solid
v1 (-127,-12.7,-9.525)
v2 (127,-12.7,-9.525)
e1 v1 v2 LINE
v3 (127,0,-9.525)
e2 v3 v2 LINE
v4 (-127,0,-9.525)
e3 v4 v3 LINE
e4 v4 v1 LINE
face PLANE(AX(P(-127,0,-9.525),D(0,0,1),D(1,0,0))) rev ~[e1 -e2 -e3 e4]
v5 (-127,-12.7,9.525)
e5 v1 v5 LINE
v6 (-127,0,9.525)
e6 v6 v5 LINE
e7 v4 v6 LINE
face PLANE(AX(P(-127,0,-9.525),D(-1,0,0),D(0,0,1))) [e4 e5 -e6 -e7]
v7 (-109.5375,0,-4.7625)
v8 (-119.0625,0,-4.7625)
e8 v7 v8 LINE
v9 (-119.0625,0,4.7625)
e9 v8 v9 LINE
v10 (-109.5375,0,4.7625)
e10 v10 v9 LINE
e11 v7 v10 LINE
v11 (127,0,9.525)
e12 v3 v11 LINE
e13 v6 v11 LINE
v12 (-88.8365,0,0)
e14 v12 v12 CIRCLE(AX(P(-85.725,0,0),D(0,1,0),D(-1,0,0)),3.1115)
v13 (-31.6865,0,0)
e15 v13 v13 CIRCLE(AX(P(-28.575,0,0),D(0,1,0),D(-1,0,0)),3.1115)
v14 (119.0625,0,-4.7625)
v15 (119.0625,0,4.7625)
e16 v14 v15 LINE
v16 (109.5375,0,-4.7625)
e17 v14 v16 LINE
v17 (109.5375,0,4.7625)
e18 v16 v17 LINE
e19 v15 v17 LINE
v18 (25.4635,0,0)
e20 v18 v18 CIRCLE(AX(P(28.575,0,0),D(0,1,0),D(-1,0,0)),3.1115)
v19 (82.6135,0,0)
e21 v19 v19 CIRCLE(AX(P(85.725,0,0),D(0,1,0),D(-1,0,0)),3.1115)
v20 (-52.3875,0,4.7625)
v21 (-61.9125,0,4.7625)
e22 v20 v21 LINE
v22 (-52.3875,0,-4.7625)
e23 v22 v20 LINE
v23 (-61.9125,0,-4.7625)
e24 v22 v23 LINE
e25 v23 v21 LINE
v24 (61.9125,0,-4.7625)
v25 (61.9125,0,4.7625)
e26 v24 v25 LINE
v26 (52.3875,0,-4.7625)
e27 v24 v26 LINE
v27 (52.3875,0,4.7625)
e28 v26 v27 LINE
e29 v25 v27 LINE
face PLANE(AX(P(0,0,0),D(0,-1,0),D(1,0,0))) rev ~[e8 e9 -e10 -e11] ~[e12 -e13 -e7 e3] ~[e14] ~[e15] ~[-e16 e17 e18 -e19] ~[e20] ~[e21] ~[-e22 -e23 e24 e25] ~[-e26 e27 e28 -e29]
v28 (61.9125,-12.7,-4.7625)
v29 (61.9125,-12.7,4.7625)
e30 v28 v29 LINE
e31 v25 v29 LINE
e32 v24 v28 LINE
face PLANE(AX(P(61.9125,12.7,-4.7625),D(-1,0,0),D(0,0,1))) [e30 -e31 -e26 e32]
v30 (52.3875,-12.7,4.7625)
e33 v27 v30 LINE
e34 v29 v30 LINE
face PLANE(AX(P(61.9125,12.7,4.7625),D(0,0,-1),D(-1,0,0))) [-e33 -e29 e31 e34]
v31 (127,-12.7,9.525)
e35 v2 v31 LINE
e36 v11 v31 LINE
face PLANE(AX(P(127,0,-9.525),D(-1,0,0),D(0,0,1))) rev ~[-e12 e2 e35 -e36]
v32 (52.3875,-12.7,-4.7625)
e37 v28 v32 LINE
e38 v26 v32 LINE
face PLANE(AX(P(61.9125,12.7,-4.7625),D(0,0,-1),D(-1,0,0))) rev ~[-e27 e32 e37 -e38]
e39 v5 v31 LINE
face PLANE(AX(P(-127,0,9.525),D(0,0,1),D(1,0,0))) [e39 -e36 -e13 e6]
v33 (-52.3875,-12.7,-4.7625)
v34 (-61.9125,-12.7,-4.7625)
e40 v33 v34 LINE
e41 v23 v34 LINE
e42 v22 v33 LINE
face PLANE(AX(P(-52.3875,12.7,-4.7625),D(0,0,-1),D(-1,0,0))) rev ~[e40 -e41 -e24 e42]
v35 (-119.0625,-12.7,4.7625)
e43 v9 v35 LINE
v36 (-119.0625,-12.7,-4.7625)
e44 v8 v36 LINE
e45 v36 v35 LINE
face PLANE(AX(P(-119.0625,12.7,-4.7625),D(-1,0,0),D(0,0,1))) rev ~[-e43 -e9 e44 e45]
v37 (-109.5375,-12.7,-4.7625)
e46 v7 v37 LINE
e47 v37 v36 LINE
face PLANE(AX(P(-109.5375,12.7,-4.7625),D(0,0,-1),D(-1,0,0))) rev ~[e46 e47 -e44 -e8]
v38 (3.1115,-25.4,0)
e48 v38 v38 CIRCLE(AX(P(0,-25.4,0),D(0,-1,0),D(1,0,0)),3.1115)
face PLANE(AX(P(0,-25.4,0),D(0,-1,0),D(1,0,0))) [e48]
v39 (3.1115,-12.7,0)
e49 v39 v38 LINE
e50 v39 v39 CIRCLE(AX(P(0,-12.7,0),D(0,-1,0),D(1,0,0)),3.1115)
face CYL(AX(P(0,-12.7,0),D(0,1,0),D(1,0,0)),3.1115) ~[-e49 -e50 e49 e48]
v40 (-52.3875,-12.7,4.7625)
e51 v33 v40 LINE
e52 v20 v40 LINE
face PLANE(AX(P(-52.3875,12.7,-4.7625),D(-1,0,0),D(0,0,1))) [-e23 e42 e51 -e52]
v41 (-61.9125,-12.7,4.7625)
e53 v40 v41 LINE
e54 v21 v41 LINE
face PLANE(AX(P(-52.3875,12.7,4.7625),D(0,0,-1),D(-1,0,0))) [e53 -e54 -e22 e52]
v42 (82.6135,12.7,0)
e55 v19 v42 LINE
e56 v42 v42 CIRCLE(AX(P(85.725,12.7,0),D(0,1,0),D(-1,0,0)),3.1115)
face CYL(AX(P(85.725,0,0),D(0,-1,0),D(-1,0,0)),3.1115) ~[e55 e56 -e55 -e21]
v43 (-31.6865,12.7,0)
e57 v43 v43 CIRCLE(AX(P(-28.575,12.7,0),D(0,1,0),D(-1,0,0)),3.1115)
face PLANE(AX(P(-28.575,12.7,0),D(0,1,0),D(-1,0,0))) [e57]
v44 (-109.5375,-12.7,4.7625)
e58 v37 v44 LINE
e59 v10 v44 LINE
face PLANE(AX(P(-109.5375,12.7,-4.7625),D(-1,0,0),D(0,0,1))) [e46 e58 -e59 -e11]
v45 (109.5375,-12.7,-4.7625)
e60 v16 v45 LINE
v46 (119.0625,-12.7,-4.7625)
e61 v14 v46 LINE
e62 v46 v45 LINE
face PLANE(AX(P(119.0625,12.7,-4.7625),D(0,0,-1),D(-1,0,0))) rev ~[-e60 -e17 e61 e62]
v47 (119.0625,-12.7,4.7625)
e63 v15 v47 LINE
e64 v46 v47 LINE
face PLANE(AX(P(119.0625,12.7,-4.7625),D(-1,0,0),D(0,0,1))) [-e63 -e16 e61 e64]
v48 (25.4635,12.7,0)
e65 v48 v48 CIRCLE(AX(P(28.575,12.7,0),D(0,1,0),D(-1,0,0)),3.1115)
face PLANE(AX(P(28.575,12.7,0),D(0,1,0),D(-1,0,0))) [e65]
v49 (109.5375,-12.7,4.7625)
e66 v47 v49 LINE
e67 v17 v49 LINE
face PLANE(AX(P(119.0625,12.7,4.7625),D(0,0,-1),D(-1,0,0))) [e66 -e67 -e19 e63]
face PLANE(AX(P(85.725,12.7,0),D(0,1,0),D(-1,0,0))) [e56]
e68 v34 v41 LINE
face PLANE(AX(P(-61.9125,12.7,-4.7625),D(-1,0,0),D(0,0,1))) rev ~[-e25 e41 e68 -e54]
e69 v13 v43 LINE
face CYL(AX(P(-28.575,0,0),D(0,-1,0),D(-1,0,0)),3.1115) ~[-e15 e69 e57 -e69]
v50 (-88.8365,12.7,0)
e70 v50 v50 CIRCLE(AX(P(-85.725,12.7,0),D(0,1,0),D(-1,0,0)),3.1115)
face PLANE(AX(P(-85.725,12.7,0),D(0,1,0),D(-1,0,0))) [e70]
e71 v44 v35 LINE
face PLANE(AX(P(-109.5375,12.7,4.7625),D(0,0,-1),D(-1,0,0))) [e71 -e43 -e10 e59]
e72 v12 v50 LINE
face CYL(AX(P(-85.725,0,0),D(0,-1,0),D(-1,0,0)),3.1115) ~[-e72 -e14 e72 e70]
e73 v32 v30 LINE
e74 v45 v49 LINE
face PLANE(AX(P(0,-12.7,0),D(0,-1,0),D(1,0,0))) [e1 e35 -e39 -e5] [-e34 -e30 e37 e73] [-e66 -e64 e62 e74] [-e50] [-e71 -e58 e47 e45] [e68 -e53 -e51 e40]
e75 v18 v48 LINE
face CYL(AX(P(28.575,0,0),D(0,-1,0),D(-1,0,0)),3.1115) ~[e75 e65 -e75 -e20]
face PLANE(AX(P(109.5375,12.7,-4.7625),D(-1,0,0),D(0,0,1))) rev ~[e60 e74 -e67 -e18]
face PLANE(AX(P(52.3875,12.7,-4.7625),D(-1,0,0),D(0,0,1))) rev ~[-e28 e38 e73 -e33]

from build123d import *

# Parameters (mm, degrees)
F0_W     = 254
F0_H     = 19.05
F1_DEPTH = 12.7
F2_R     = 3.1115
F3_DEPTH = 12.7
F4_W     = 9.525
F4_H     = 9.525
F4_R     = 3.1115
F5_DEPTH = 12.7
F6_DEPTH = 25.4


# Not quite as in the source:
# - a feature names something its author has since deleted; it is built from what else it names


with BuildPart() as f1:
    # F0 (on Front) → F1 (new body)
    with BuildSketch(Plane.XZ):
        Rectangle(F0_W, F0_H)
    extrude(amount=F1_DEPTH)

    # F2 (on face) → F3 (join)
    with BuildSketch(Plane.XZ.offset(12.7)):
        Circle(F2_R)
    extrude(amount=F3_DEPTH)

    # F4 (on face) → F5 (join)
    with BuildSketch(Plane(origin=(0, 0, 0), x_dir=(-1, 0, 0), z_dir=(0, 1, 0))):
        with Locations((-114.3, 0)):
            Rectangle(F4_W, F4_H)
        with Locations((-85.725, 0)):
            Circle(F4_R)
        with Locations((-57.15, 0)):
            Rectangle(F4_W, F4_H)
        with Locations((-28.575, 0)):
            Circle(F4_R)
        with Locations((28.575, 0)):
            Circle(F4_R)
        with Locations((57.15, 0)):
            Rectangle(F4_W, F4_H)
        with Locations((85.725, 0)):
            Circle(F4_R)
        with Locations((114.3, 0)):
            Rectangle(F4_W, F4_H)
    extrude(amount=F5_DEPTH)

    # F6 (cut): faces of the model
    f6_faces = [f1.faces().sort_by_distance(p)[0] for p in [
        (114.3, 12.7, 0),
        (57.15, 12.7, 0),
        (-57.15, 12.7, 0),
        (-114.3, 12.7, 0),
    ]]
    extrude(f6_faces, amount=-F6_DEPTH, mode=Mode.SUBTRACT)


solid = f1.part
